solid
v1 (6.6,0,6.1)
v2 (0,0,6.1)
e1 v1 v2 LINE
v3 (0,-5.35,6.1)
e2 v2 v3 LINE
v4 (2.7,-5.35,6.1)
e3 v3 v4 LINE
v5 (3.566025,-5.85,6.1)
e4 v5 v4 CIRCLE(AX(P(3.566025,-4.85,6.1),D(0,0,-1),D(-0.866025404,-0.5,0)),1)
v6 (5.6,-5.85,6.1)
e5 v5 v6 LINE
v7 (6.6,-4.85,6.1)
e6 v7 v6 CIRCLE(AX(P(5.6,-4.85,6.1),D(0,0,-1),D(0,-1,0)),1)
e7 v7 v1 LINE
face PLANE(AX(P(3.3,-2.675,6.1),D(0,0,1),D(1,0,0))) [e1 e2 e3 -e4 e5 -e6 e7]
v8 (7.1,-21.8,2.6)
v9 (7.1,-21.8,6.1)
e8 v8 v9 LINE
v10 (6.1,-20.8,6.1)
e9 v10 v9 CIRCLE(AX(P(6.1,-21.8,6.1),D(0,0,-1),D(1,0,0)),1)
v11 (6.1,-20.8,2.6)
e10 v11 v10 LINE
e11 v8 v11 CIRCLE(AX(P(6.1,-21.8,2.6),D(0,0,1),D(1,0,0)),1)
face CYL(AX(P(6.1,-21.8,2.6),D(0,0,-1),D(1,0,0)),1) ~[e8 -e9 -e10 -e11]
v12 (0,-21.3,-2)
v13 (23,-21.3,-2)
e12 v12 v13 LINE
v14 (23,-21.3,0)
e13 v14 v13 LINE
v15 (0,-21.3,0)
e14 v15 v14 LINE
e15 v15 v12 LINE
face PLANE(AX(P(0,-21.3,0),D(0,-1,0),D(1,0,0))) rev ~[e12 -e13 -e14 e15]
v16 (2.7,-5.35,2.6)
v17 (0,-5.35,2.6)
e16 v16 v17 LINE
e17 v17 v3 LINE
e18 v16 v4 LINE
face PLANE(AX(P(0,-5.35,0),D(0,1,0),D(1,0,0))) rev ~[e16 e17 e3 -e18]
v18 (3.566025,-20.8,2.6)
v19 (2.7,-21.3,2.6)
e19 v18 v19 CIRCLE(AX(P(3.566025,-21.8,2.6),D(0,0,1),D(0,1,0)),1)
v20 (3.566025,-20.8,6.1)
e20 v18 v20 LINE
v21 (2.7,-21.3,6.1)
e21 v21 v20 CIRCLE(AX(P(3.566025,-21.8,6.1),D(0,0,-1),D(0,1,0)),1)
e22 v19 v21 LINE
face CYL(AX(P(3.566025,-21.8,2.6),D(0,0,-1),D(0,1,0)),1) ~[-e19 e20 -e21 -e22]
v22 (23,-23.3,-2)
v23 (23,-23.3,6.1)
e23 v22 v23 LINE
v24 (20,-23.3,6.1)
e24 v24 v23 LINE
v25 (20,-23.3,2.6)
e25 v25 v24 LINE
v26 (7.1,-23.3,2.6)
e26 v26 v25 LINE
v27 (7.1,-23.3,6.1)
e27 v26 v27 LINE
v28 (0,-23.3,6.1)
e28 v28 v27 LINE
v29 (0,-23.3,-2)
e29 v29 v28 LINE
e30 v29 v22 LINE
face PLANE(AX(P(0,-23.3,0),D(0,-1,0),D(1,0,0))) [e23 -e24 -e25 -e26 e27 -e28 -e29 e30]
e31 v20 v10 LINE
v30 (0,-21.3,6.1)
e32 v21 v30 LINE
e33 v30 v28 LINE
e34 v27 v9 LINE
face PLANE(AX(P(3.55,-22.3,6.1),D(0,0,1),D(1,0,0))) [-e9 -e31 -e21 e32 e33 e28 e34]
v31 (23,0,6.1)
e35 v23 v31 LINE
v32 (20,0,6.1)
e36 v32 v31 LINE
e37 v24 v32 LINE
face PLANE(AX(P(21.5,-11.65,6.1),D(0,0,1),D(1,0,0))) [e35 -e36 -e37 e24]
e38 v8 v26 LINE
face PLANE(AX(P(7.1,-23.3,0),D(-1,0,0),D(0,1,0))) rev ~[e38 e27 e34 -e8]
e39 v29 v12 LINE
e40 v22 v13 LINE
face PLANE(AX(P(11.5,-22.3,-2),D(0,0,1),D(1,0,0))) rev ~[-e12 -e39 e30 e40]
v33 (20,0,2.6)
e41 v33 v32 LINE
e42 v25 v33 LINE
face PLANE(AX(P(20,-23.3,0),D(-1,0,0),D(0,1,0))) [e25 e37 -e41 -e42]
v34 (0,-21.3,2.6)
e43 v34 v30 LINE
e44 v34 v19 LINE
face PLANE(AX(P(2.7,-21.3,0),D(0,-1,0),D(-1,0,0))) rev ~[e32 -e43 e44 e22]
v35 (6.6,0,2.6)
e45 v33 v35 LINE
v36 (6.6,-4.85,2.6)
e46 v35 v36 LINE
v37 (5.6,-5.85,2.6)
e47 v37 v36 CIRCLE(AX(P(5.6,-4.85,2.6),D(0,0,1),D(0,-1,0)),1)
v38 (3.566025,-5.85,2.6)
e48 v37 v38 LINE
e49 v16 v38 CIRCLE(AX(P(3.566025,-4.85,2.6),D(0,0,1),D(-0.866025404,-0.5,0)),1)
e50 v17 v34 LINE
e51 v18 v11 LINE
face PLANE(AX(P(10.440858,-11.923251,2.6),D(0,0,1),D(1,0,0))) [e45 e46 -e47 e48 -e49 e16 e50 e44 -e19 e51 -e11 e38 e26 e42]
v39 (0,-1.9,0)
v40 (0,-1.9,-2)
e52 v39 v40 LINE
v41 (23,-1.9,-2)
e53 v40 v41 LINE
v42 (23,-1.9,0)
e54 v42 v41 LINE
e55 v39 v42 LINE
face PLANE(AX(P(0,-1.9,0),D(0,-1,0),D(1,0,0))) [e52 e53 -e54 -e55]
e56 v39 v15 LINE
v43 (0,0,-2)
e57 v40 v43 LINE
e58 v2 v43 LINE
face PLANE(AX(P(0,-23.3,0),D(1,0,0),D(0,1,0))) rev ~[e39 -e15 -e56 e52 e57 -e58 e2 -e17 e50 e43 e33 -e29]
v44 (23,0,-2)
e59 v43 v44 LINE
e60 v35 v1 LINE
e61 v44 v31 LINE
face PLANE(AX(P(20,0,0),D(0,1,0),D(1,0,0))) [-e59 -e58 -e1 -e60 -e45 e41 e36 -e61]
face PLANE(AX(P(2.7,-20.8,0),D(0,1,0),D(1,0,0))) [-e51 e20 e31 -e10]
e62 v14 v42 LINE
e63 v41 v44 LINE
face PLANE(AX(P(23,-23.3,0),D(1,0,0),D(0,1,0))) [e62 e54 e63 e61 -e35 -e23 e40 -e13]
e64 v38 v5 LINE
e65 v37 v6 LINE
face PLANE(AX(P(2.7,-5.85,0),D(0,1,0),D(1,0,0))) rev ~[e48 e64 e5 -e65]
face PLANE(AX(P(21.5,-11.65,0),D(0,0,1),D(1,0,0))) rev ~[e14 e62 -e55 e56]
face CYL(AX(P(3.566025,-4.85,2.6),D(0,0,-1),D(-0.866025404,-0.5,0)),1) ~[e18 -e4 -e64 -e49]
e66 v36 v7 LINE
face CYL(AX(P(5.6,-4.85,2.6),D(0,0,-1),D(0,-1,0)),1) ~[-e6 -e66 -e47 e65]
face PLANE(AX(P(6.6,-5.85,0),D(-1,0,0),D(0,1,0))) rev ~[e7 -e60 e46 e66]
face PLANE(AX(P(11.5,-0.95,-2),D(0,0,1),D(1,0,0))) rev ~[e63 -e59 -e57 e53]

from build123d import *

# Parameters (mm, degrees)
F1_DEPTH    = 2.6
F0_W        = 3
F0_H        = 23.3
F0_W_2      = 4.4
F0_H_2      = 0.5
F0_W_3      = 3.9
F2_DEPTH    = 6.1
F3_T1_DEPTH = 6
F3_T3_DEPTH = 5.6650635095
F4_W        = 23
F4_H        = 2
F4_H_2      = 1.9
F5_DEPTH    = 2


# Not quite as in the source:
# - a fillet or chamfer that OpenCascade refuses, or shapes differently, is made with other operations: its cross-section is extruded or revolved along the edge and cut away or added


with BuildPart() as f1:
    # F0 (on Top) → F1 (new body)
    with BuildSketch(Plane.XY):
        Polygon((20, 0), (6.6, 0), (6.6, -5.35), (6.6, -5.85), (2.7, -5.85), (2.7, -5.35), (0, -5.35), (0, -21.3), (2.7, -21.3), (2.7, -20.8), (7.1, -20.8), (7.1, -21.3), (7.1, -23.3), (20, -23.3), align=None)
    extrude(amount=F1_DEPTH)

    # F0 (on Top) → F2 (join)
    with BuildSketch(Plane.XY):
        with Locations((21.5, -11.65)):
            Rectangle(F0_W, F0_H)
        Polygon((2.7, -21.3), (0, -21.3), (0, -23.3), (7.1, -23.3), (7.1, -21.3), align=None)
        Polygon((6.6, 0), (0, 0), (0, -5.35), (2.7, -5.35), (6.6, -5.35), align=None)
        with Locations((4.9, -21.05)):
            Rectangle(F0_W_2, F0_H_2)
        with Locations((4.65, -5.6)):
            Rectangle(F0_W_3, F0_H_2)
    extrude(amount=F2_DEPTH)

    # F3: fillet of radius 1 on 4 edges, made by hand

    # F3_s2 → F3_t1 (cut)
    with BuildSketch(Plane.XY.offset(2.6)):
        with BuildLine():
            ThreePointArc((7.1, -21.8), (6.8071067812, -21.0928932188), (6.1, -20.8))
            Line((6.1, -20.8), (7.1, -20.8))
            Line((7.1, -20.8), (7.1, -21.8))
        make_face()
        with BuildLine():
            ThreePointArc((5.6, -5.85), (6.3071067812, -5.5571067812), (6.6, -4.85))
            Line((6.6, -4.85), (6.6, -5.85))
            Line((6.6, -5.85), (5.6, -5.85))
        make_face()
    extrude(amount=F3_T1_DEPTH, mode=Mode.SUBTRACT)

    # F3_s4 → F3_t3 (cut)
    with BuildSketch(Plane.XY.offset(2.6)):
        with BuildLine():
            ThreePointArc((3.5660254038, -20.8), (3.0660254038, -20.9339745962), (2.7, -21.3))
            Line((2.7, -21.3), (2.7, -20.8))
            Line((2.7, -20.8), (3.5660254038, -20.8))
        make_face()
        with BuildLine():
            ThreePointArc((2.7, -5.35), (3.0660254038, -5.7160254038), (3.5660254038, -5.85))
            Line((3.5660254038, -5.85), (2.7, -5.85))
            Line((2.7, -5.85), (2.7, -5.35))
        make_face()
    extrude(amount=F3_T3_DEPTH, mode=Mode.SUBTRACT)

    # F4 (on Top) → F5 (join)
    with BuildSketch(Plane.XY):
        with Locations((11.5, -22.3)):
            Rectangle(F4_W, F4_H)
        with Locations((11.5, -0.95)):
            Rectangle(F4_W, F4_H_2)
    extrude(amount=-F5_DEPTH)


solid = f1.part
